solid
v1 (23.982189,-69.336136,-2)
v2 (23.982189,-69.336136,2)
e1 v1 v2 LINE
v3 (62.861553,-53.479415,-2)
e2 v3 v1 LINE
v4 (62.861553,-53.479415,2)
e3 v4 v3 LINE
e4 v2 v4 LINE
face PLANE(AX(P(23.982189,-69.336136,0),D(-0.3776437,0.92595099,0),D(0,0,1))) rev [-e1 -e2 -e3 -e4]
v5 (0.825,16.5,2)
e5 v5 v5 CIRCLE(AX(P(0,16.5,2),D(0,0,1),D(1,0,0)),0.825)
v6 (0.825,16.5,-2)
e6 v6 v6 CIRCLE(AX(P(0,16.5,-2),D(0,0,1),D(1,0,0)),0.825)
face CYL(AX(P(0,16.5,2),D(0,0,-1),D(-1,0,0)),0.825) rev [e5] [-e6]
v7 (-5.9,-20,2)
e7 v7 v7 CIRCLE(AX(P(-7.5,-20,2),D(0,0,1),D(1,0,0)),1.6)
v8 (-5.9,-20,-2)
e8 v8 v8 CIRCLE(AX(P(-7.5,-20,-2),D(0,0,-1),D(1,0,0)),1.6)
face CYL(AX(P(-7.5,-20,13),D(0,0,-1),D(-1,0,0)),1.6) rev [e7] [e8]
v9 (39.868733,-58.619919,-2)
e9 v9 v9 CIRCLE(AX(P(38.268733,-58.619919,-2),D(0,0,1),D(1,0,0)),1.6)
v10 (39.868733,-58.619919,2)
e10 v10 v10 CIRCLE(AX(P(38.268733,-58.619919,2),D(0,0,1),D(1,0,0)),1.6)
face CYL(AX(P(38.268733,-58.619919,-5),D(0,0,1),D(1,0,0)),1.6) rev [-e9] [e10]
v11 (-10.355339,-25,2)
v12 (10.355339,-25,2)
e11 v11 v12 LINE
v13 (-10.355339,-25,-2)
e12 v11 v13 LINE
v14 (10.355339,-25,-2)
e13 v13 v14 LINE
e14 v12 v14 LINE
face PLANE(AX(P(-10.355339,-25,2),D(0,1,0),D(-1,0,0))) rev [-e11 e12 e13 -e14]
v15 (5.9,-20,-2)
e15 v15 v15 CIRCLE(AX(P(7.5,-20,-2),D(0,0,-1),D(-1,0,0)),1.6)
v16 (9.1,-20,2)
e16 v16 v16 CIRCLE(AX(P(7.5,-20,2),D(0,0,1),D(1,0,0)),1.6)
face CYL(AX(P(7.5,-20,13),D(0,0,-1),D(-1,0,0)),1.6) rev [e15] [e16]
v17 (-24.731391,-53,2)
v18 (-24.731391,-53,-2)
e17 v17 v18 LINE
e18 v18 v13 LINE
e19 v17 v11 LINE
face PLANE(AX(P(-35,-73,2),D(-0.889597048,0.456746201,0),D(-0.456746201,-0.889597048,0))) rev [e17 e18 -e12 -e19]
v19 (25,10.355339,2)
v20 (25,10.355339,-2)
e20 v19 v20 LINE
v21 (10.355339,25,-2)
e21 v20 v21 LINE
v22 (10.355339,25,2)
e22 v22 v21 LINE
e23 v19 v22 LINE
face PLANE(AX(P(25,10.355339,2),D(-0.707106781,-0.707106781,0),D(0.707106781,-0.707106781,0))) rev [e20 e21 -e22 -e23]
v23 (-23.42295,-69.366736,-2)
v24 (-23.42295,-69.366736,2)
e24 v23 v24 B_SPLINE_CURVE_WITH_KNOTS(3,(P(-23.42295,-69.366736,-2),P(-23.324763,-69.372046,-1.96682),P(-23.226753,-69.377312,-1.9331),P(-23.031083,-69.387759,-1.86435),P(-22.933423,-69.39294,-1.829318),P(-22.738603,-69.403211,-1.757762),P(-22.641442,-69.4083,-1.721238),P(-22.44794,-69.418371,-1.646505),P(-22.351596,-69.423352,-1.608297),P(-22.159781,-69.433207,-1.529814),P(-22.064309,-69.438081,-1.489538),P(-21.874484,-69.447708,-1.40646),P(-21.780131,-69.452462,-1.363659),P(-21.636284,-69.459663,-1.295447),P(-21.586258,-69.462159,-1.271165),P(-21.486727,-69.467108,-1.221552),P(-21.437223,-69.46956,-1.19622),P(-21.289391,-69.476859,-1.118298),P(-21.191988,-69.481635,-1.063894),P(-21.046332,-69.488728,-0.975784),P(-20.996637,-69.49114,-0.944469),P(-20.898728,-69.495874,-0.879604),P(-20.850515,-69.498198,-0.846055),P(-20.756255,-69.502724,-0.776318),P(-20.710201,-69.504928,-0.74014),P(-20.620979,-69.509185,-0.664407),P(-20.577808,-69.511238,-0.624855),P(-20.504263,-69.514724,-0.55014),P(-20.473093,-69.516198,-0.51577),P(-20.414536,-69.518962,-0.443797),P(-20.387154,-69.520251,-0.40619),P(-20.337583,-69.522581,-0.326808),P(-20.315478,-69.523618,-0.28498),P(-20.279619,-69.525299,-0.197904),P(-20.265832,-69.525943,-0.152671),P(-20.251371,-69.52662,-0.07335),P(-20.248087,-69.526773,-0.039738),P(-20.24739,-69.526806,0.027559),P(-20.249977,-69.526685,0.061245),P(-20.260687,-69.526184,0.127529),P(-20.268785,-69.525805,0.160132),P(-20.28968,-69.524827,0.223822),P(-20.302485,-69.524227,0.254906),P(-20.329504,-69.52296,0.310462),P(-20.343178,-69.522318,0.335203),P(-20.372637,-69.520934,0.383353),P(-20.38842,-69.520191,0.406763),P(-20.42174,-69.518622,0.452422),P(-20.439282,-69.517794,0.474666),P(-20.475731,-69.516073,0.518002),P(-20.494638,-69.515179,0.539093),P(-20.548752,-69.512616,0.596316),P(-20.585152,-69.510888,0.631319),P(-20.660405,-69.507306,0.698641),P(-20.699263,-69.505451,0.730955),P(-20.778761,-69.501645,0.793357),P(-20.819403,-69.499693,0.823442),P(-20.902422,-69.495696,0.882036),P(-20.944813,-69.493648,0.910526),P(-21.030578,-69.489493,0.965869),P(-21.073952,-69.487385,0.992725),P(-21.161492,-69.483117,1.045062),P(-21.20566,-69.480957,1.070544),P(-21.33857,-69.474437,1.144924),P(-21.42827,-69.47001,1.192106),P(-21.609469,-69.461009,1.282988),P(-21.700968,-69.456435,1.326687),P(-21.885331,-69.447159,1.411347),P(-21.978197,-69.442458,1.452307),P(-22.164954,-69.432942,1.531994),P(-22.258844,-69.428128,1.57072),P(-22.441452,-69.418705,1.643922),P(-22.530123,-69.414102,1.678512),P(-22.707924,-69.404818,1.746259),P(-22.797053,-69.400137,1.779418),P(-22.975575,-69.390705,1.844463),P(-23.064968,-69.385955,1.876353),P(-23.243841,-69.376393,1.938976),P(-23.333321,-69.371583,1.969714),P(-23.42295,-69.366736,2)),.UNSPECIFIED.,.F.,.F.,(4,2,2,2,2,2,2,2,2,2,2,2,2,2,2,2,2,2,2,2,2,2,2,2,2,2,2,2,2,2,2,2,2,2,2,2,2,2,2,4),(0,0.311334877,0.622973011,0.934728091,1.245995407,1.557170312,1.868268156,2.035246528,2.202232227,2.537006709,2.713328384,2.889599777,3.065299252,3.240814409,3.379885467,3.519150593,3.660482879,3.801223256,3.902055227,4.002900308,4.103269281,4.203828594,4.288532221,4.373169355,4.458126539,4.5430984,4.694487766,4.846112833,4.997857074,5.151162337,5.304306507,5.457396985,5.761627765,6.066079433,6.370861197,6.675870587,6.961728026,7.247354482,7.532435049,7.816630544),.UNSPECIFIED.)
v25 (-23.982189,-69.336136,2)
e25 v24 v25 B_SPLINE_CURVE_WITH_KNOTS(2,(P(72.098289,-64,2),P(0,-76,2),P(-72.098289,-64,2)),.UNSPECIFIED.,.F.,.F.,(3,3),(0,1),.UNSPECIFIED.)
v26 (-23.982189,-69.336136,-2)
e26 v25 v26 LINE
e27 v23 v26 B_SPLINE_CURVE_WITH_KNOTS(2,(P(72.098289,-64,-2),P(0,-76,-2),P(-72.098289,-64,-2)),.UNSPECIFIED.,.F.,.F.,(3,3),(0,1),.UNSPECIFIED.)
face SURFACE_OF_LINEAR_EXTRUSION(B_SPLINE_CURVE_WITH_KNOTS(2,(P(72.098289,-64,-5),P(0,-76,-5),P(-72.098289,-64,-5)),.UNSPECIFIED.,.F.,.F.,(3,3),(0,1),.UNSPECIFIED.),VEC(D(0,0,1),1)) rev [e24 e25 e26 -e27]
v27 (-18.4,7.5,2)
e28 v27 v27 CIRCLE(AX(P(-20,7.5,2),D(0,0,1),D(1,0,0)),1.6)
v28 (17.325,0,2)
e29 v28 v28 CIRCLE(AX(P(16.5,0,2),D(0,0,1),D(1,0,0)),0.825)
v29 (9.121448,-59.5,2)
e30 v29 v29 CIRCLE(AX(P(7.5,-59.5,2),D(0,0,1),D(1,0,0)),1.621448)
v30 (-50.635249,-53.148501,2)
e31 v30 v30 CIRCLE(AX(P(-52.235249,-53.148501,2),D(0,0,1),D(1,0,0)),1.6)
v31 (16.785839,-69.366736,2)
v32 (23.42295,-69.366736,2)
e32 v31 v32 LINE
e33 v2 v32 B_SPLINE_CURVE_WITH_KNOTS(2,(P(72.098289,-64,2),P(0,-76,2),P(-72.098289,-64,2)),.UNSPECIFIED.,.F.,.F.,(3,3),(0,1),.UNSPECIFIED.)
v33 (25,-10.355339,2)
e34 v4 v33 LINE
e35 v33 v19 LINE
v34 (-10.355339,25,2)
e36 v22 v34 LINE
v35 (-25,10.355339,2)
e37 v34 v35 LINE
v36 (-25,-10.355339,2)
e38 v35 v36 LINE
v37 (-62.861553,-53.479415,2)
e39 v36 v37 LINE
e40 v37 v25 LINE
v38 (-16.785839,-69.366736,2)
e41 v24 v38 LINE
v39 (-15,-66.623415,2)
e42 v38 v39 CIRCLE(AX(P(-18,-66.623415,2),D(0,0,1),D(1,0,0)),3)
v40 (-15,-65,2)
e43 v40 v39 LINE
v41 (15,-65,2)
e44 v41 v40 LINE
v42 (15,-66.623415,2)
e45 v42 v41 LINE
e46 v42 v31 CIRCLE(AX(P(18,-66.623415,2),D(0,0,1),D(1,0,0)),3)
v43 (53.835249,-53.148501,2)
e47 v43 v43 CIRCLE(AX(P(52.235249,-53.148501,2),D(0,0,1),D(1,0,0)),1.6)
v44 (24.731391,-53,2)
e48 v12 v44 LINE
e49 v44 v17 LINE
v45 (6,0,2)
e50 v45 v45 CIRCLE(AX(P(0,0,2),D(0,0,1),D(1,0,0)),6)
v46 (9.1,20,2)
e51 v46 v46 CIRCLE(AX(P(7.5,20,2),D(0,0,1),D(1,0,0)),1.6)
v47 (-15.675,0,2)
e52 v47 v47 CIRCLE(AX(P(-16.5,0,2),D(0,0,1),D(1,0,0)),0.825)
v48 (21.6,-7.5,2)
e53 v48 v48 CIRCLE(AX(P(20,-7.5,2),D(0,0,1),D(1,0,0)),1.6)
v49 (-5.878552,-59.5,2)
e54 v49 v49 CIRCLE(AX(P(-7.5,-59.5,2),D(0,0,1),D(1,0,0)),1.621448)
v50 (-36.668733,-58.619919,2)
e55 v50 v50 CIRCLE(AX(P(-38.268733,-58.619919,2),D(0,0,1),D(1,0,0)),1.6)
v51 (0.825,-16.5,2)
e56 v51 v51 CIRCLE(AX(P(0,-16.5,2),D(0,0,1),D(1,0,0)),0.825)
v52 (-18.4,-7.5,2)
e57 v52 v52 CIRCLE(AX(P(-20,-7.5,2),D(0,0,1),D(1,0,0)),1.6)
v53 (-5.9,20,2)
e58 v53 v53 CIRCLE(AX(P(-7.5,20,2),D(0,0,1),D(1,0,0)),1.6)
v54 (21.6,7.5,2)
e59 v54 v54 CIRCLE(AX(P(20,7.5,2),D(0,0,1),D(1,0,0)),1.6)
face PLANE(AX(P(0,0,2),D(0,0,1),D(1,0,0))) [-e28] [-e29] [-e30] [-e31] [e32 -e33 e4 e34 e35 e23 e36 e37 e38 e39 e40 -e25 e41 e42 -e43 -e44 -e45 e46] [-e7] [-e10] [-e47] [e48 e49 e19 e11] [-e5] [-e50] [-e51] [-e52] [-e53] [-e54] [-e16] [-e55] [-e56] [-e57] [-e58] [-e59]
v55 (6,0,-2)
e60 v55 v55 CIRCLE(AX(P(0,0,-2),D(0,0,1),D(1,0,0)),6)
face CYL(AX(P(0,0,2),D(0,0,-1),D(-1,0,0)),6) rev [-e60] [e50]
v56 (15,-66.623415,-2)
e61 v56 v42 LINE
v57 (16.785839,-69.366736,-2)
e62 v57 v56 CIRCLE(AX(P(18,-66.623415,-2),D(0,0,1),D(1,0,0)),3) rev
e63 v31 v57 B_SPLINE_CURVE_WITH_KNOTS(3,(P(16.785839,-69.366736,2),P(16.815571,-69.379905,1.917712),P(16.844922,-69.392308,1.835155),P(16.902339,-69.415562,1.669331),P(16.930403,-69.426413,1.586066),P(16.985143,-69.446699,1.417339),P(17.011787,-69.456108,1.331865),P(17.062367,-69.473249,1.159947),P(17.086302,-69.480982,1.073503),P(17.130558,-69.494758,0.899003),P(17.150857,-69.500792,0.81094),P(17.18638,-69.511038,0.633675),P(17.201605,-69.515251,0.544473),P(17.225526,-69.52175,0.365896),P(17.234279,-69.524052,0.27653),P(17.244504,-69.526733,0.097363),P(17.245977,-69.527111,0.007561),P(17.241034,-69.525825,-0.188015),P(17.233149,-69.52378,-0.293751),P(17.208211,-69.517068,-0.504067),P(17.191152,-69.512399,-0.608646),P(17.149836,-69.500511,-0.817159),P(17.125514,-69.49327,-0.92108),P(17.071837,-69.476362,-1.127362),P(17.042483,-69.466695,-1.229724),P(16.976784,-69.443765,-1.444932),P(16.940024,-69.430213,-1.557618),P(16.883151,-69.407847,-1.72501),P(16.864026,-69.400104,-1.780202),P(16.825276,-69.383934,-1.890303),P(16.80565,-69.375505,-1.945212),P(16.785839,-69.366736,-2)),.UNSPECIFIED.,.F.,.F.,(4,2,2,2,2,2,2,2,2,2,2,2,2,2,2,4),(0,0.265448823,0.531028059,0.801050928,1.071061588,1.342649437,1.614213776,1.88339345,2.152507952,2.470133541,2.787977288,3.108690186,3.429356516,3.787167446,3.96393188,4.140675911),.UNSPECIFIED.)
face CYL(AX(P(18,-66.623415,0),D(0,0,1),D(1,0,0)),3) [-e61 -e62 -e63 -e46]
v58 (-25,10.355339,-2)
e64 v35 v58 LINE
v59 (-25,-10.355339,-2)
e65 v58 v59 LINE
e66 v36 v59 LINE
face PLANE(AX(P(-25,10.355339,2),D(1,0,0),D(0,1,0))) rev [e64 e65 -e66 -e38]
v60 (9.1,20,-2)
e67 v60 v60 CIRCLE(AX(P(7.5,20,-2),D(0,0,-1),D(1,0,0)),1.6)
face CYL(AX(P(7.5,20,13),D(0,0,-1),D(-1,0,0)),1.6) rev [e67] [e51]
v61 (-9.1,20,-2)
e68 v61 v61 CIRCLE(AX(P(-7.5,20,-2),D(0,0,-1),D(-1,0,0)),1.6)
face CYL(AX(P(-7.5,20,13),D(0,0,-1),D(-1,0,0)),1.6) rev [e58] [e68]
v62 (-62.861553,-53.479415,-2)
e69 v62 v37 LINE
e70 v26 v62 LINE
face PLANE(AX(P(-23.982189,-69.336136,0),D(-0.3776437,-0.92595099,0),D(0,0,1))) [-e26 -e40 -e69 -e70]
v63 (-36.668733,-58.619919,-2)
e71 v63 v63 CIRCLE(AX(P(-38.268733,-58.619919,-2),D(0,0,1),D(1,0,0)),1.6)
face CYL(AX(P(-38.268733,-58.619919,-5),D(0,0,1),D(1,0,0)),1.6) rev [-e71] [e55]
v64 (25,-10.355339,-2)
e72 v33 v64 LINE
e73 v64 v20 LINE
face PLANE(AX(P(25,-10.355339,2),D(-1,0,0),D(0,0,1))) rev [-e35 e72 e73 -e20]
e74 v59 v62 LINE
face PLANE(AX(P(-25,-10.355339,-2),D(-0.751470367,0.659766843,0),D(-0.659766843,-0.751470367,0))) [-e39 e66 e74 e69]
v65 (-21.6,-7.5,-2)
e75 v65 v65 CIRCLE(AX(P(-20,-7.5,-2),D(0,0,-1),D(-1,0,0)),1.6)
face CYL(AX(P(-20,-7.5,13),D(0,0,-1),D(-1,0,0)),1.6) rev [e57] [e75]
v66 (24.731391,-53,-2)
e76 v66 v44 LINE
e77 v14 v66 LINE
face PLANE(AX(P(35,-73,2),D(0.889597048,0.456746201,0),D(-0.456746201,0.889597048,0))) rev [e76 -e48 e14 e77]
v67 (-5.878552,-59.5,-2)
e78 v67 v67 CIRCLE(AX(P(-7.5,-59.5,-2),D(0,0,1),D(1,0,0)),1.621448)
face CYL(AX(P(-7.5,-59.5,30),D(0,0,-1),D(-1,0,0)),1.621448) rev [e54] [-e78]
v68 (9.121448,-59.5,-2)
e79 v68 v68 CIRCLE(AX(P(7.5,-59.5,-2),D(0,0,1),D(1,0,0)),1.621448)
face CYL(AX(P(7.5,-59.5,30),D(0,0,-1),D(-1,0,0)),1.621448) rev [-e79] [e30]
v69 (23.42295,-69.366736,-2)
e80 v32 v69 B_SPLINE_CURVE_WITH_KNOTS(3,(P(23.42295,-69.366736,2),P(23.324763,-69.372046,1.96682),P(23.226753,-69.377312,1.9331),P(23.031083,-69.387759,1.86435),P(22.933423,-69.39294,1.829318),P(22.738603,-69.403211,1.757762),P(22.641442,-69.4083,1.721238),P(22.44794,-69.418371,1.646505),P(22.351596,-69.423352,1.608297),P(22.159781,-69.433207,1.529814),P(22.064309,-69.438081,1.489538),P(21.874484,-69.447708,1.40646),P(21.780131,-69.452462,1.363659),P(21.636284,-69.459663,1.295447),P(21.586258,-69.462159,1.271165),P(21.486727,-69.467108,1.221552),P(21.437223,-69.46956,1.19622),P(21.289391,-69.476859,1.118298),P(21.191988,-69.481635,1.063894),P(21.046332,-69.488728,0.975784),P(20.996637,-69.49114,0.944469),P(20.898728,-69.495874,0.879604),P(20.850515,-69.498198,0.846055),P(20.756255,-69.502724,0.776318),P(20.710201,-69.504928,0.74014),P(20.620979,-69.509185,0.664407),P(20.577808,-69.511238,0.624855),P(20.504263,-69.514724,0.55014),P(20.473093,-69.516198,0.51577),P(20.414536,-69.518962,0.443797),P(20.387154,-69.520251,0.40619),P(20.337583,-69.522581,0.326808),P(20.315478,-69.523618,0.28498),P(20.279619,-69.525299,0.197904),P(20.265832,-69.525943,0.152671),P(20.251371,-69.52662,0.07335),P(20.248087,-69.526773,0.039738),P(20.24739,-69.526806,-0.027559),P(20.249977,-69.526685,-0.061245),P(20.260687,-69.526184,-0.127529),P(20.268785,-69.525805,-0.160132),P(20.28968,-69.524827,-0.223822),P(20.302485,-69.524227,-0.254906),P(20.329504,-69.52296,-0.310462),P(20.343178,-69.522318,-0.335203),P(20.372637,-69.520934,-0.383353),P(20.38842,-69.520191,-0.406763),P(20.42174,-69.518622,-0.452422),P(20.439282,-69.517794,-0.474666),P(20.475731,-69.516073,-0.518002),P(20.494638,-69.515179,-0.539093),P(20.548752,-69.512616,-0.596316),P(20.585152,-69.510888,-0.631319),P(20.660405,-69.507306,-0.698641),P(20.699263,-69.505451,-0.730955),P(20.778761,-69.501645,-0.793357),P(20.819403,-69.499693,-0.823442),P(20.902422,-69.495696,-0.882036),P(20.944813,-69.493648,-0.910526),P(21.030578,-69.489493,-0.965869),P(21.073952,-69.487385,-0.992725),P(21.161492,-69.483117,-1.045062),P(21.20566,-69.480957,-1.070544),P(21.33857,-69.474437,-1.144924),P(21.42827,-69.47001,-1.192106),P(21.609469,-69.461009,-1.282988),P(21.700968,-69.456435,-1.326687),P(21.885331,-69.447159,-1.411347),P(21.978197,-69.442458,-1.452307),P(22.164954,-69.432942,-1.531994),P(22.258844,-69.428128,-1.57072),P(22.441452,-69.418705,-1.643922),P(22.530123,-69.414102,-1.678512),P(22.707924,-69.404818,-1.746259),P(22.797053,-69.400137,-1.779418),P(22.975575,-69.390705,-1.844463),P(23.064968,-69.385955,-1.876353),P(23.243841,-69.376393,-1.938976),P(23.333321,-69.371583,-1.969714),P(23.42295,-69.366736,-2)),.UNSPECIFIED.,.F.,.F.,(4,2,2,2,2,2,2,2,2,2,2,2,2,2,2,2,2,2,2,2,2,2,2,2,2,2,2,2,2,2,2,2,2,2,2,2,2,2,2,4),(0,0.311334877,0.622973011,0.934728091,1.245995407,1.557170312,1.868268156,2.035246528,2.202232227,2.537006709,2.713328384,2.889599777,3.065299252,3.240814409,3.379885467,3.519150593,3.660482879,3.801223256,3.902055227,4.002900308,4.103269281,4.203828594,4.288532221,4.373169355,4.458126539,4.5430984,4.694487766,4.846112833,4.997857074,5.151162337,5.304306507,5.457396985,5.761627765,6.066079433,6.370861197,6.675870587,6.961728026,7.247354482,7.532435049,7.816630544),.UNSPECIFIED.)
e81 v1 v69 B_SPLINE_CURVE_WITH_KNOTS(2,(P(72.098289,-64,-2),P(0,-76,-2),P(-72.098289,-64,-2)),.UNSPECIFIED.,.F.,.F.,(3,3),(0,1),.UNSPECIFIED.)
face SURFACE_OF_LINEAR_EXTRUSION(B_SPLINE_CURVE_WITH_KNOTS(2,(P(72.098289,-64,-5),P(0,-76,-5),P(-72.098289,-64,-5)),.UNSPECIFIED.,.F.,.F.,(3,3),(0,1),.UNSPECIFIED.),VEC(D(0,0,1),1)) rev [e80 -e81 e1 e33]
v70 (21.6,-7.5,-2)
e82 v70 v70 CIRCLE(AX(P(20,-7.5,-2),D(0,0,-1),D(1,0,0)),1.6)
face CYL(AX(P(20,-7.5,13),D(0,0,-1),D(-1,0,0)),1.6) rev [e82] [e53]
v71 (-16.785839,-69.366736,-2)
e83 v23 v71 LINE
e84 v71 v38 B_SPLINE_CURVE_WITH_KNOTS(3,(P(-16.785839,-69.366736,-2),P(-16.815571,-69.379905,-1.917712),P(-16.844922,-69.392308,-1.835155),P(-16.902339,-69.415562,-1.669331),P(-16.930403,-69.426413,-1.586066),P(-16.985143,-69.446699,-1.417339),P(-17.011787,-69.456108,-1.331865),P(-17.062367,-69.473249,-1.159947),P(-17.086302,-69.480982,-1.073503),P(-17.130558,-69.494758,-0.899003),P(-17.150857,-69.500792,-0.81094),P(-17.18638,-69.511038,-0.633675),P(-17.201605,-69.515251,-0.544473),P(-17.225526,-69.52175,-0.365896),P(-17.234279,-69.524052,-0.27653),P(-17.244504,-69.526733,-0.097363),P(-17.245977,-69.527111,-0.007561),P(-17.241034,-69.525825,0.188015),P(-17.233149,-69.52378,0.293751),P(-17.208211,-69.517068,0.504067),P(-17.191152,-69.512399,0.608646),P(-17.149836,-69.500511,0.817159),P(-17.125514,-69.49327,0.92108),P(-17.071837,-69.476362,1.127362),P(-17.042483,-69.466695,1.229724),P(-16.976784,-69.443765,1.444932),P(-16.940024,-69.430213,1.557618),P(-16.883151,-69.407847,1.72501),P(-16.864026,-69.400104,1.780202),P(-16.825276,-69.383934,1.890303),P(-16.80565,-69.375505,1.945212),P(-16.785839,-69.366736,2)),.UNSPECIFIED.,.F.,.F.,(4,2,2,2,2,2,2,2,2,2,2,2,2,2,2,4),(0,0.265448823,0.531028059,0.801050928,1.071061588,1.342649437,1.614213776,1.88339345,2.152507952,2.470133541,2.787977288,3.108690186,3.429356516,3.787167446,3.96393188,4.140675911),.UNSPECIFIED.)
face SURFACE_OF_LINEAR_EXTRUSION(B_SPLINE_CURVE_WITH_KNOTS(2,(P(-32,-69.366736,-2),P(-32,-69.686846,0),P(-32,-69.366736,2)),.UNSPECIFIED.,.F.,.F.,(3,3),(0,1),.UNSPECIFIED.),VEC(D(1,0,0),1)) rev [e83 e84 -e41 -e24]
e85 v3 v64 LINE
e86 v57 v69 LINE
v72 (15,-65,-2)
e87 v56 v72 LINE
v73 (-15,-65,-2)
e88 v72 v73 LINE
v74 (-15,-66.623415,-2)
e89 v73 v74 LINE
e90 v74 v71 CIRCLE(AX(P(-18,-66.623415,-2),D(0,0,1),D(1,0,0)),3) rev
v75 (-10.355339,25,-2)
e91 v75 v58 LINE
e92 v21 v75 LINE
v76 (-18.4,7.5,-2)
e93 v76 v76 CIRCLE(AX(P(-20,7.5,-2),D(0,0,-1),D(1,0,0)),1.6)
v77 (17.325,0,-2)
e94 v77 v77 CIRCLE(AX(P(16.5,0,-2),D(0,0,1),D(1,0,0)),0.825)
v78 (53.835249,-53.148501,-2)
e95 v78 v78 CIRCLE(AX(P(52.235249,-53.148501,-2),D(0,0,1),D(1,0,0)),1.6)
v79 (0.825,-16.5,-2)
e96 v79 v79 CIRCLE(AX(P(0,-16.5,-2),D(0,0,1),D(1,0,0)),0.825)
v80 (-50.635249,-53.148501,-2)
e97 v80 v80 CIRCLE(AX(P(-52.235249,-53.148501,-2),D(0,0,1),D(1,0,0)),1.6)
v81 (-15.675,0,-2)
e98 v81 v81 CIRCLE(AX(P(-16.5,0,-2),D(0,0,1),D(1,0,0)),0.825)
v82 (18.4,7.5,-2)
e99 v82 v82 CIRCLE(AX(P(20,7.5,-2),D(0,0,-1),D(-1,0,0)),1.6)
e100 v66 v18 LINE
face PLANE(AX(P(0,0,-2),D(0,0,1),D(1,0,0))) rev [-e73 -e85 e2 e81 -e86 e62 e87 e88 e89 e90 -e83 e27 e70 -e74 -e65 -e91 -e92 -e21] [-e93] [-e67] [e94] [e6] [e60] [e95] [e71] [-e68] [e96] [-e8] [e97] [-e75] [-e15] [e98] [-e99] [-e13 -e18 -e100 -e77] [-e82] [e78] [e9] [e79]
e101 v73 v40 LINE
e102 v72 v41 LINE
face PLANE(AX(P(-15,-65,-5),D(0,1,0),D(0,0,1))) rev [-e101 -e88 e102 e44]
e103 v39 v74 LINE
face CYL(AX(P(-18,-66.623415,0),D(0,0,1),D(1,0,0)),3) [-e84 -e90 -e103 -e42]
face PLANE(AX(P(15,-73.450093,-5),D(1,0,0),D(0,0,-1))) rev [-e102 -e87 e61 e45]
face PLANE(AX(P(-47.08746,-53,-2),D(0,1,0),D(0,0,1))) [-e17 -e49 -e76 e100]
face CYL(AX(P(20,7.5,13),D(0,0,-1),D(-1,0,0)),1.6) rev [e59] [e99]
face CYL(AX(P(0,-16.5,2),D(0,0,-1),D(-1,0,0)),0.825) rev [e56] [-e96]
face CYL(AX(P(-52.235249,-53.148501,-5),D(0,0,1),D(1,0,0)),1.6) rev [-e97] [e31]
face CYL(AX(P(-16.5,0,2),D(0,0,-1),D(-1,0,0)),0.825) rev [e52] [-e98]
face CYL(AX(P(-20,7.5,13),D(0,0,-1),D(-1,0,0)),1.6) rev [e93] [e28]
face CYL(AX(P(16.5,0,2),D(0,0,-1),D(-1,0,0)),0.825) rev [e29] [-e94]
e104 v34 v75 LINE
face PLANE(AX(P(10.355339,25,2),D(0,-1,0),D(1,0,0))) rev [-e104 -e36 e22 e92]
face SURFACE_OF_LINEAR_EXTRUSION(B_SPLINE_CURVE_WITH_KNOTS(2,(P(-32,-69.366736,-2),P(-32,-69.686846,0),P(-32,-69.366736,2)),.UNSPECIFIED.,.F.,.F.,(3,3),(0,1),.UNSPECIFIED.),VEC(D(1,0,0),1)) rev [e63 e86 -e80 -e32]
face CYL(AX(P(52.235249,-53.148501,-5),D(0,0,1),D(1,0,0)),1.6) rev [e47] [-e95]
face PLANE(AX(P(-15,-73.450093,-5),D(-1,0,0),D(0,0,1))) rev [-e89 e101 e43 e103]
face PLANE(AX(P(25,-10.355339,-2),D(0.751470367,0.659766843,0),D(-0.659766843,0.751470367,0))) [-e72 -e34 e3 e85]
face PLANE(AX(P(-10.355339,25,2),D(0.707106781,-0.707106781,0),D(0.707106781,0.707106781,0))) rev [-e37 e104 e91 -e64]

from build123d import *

# Parameters (mm, degrees)
SKETCH_2_R           = 0.825
SKETCH_2_R_2         = 6
EXTRUDE_1_DEPTH      = 2
SKETCH_4_R           = 1.6
CUT_EXTRUDE_1_DEPTH  = 15
EXTRUDE_2_DEPTH      = 2
EXTRUDE_3_DEPTH      = 2
SKETCH_21_W          = 94.174920184
SKETCH_21_H          = 20
EXTRUDE_5_DEPTH      = 4
CUT_EXTRUDE_10_DEPTH = 7
SKETCH_23_W          = 30
SKETCH_23_H          = 8.450093073
CUT_EXTRUDE_11_DEPTH = 7
CHAMFER_START        = -2
CHAMFER_6_DEPTH      = 4
SKETCH_25_R          = 1.6
CUT_EXTRUDE_12_DEPTH = 7
FILLET_3_R           = 3
CUT_EXTRUDE_13_DEPTH = 32
SKETCH_27_R          = 1.621448002
CUT_EXTRUDE_14_DEPTH = 32


with BuildPart() as part:
    # 草图2 → 凸台-拉伸1 (new, symmetric)
    with BuildSketch(Plane.XY):
        Polygon((10.355339059, 25), (-10.355339059, 25), (-25, 10.355339059), (-25, -10.355339059), (-10.355339059, -25), (10.355339059, -25), (25, -10.355339059), (25, 10.355339059), align=None)
        with Locations((-16.5, 0)):
            Circle(SKETCH_2_R, mode=Mode.SUBTRACT)
        with Locations((0, 16.5)):
            Circle(SKETCH_2_R, mode=Mode.SUBTRACT)
        with Locations((16.5, 0)):
            Circle(SKETCH_2_R, mode=Mode.SUBTRACT)
        with Locations((0, -16.5)):
            Circle(SKETCH_2_R, mode=Mode.SUBTRACT)
        Circle(SKETCH_2_R_2, mode=Mode.SUBTRACT)
    extrude(amount=EXTRUDE_1_DEPTH, both=True)

    # 草图4 → 切除-拉伸1 (cut)
    with BuildSketch(Plane(origin=(0, 0, -2), x_dir=(-1, 0, 0), z_dir=(0, 0, -1))):
        with Locations((-7.5, -20)):
            Circle(SKETCH_4_R)
        with Locations(Location((7.5, -20, 0), (0, 0, 180))):
            Circle(SKETCH_4_R)
        with Locations((-20, 7.5)):
            Circle(SKETCH_4_R)
        with Locations(Location((-20, -7.5, 0), (0, 0, 180))):
            Circle(SKETCH_4_R)
        with Locations((7.5, 20)):
            Circle(SKETCH_4_R)
        with Locations(Location((-7.5, 20, 0), (0, 0, 180))):
            Circle(SKETCH_4_R)
        with Locations((20, -7.5)):
            Circle(SKETCH_4_R)
        with Locations(Location((20, 7.5, 0), (0, 0, 180))):
            Circle(SKETCH_4_R)
    extrude(amount=-CUT_EXTRUDE_1_DEPTH, mode=Mode.SUBTRACT)

    # 草图5 → 凸台-拉伸2 (add, symmetric)
    with BuildSketch(Plane.XY):
        Polygon((-25, -10.355339059), (-80, -73), (-60, -73), (-11.17766953, -24.17766953), align=None)
        Polygon((60, -73), (80, -73), (25, -10.355339059), (11.17766953, -24.17766953), align=None)
    extrude(amount=EXTRUDE_2_DEPTH, both=True)

    # 草图6 → 凸台-拉伸3 (add, symmetric)
    with BuildSketch(Plane.XY):
        Polygon((-60, -73), (-35, -73), (-10.355339059, -25), (-11.17766953, -24.17766953), align=None)
        Polygon((60, -73), (11.17766953, -24.17766953), (10.355339059, -25), (35, -73), align=None)
    extrude(amount=EXTRUDE_3_DEPTH, both=True)

    # 草图21 → 凸台-拉伸5 (add)
    with BuildSketch(Plane.XY.offset(2)):
        with Locations((0, -63)):
            Rectangle(SKETCH_21_W, SKETCH_21_H)
    extrude(amount=-EXTRUDE_5_DEPTH)

    # 草图22 → 切除-拉伸10 (cut, symmetric)
    with BuildSketch(Plane.XY.offset(2)):
        with BuildLine():
            Line((-72.098289103, -64), (-93.602322684, -86.771790357))
            Line((-93.602322684, -86.771790357), (107.138572214, -85.642128596))
            Line((107.138572214, -85.642128596), (72.098289103, -64))
            add(Edge.make_bspline(
                [(-72.098289103, -64), (0, -76), (72.098289103, -64)],
                knots=[0, 0, 0, 1, 1, 1], degree=2))
        make_face()
    extrude(amount=CUT_EXTRUDE_10_DEPTH, both=True, mode=Mode.SUBTRACT)

    # 草图23 → 切除-拉伸11 (cut, symmetric)
    with BuildSketch(Plane.XY.offset(2)):
        with Locations((0, -69.225046537)):
            Rectangle(SKETCH_23_W, SKETCH_23_H)
    extrude(amount=CUT_EXTRUDE_11_DEPTH, both=True, mode=Mode.SUBTRACT)

    # 倒角6: read off the stored shape, not the designer's step
    # 倒角6 outline → 倒角6 (cut)
    with BuildSketch(Plane.XY.offset(CHAMFER_START)):
        with BuildLine():
            Line((72.098289103, -64), (62.861553298, -53.47941486))
            Line((62.861553298, -53.47941486), (23.982189464, -69.336136194))
            add(Edge.make_bspline(
                [(72.098289103, -64), (48.040239283, -68.004208719), (23.982189464, -69.336136194)],
                knots=[0, 0, 0, 0.33368406, 0.33368406, 0.33368406], degree=2))
        make_face()
        with BuildLine():
            Line((-23.982189464, -69.336136194), (-62.861553298, -53.47941486))
            Line((-62.861553298, -53.47941486), (-72.098289103, -64))
            add(Edge.make_bspline(
                [(-23.982189464, -69.336136194), (-48.040239283, -68.004208719), (-72.098289103, -64)],
                knots=[0.66631594, 0.66631594, 0.66631594, 1, 1, 1], degree=2))
        make_face()
    extrude(amount=CHAMFER_6_DEPTH, mode=Mode.SUBTRACT)

    # 草图25 → 切除-拉伸12 (cut, symmetric)
    with BuildSketch(Plane.XY.offset(2)):
        with Locations((-52.235249282, -53.148500686)):
            Circle(SKETCH_25_R)
        with Locations((-38.268733006, -58.619919434)):
            Circle(SKETCH_25_R)
        with Locations((38.268733006, -58.619919434)):
            Circle(SKETCH_25_R)
        with Locations((52.235249282, -53.148500686)):
            Circle(SKETCH_25_R)
    extrude(amount=CUT_EXTRUDE_12_DEPTH, both=True, mode=Mode.SUBTRACT)

    # 圆角3
    fillet_3_edges = [part.edges().sort_by_distance(p)[0] for p in [
        (-15, -69.740292883, -3e-07),
        (15, -69.740292883, -3e-07),
    ]]
    fillet(fillet_3_edges, radius=FILLET_3_R)

    # 草图26 → 切除-拉伸13 (cut, symmetric)
    with BuildSketch(Plane(origin=(0, 0, 0), x_dir=(0, 0, -1), z_dir=(1, 0, 0))):
        with BuildLine():
            Line((-2, -69.366736418), (-2.263749967, -70.210945681))
            Line((-2.263749967, -70.210945681), (2.547301332, -70.18897741))
            Line((2.547301332, -70.18897741), (2, -69.366736418))
            add(Edge.make_bspline(
                [(-2, -69.366736418), (0, -69.686845507), (2, -69.366736418)],
                knots=[0, 0, 0, 1, 1, 1], degree=2))
        make_face()
    extrude(amount=CUT_EXTRUDE_13_DEPTH, both=True, mode=Mode.SUBTRACT)

    # 草图27 → 切除-拉伸14 (cut, symmetric)
    with BuildSketch(Plane(origin=(0, 0, -2), x_dir=(-1, 0, 0), z_dir=(0, 0, -1))):
        with Locations(Location((-7.5, -59.5, 0), (0, 0, 180))):
            Circle(SKETCH_27_R)
        with Locations(Location((7.5, -59.5, 0), (0, 0, 180))):
            Circle(SKETCH_27_R)
    extrude(amount=CUT_EXTRUDE_14_DEPTH, both=True, mode=Mode.SUBTRACT)


solid = part.part
